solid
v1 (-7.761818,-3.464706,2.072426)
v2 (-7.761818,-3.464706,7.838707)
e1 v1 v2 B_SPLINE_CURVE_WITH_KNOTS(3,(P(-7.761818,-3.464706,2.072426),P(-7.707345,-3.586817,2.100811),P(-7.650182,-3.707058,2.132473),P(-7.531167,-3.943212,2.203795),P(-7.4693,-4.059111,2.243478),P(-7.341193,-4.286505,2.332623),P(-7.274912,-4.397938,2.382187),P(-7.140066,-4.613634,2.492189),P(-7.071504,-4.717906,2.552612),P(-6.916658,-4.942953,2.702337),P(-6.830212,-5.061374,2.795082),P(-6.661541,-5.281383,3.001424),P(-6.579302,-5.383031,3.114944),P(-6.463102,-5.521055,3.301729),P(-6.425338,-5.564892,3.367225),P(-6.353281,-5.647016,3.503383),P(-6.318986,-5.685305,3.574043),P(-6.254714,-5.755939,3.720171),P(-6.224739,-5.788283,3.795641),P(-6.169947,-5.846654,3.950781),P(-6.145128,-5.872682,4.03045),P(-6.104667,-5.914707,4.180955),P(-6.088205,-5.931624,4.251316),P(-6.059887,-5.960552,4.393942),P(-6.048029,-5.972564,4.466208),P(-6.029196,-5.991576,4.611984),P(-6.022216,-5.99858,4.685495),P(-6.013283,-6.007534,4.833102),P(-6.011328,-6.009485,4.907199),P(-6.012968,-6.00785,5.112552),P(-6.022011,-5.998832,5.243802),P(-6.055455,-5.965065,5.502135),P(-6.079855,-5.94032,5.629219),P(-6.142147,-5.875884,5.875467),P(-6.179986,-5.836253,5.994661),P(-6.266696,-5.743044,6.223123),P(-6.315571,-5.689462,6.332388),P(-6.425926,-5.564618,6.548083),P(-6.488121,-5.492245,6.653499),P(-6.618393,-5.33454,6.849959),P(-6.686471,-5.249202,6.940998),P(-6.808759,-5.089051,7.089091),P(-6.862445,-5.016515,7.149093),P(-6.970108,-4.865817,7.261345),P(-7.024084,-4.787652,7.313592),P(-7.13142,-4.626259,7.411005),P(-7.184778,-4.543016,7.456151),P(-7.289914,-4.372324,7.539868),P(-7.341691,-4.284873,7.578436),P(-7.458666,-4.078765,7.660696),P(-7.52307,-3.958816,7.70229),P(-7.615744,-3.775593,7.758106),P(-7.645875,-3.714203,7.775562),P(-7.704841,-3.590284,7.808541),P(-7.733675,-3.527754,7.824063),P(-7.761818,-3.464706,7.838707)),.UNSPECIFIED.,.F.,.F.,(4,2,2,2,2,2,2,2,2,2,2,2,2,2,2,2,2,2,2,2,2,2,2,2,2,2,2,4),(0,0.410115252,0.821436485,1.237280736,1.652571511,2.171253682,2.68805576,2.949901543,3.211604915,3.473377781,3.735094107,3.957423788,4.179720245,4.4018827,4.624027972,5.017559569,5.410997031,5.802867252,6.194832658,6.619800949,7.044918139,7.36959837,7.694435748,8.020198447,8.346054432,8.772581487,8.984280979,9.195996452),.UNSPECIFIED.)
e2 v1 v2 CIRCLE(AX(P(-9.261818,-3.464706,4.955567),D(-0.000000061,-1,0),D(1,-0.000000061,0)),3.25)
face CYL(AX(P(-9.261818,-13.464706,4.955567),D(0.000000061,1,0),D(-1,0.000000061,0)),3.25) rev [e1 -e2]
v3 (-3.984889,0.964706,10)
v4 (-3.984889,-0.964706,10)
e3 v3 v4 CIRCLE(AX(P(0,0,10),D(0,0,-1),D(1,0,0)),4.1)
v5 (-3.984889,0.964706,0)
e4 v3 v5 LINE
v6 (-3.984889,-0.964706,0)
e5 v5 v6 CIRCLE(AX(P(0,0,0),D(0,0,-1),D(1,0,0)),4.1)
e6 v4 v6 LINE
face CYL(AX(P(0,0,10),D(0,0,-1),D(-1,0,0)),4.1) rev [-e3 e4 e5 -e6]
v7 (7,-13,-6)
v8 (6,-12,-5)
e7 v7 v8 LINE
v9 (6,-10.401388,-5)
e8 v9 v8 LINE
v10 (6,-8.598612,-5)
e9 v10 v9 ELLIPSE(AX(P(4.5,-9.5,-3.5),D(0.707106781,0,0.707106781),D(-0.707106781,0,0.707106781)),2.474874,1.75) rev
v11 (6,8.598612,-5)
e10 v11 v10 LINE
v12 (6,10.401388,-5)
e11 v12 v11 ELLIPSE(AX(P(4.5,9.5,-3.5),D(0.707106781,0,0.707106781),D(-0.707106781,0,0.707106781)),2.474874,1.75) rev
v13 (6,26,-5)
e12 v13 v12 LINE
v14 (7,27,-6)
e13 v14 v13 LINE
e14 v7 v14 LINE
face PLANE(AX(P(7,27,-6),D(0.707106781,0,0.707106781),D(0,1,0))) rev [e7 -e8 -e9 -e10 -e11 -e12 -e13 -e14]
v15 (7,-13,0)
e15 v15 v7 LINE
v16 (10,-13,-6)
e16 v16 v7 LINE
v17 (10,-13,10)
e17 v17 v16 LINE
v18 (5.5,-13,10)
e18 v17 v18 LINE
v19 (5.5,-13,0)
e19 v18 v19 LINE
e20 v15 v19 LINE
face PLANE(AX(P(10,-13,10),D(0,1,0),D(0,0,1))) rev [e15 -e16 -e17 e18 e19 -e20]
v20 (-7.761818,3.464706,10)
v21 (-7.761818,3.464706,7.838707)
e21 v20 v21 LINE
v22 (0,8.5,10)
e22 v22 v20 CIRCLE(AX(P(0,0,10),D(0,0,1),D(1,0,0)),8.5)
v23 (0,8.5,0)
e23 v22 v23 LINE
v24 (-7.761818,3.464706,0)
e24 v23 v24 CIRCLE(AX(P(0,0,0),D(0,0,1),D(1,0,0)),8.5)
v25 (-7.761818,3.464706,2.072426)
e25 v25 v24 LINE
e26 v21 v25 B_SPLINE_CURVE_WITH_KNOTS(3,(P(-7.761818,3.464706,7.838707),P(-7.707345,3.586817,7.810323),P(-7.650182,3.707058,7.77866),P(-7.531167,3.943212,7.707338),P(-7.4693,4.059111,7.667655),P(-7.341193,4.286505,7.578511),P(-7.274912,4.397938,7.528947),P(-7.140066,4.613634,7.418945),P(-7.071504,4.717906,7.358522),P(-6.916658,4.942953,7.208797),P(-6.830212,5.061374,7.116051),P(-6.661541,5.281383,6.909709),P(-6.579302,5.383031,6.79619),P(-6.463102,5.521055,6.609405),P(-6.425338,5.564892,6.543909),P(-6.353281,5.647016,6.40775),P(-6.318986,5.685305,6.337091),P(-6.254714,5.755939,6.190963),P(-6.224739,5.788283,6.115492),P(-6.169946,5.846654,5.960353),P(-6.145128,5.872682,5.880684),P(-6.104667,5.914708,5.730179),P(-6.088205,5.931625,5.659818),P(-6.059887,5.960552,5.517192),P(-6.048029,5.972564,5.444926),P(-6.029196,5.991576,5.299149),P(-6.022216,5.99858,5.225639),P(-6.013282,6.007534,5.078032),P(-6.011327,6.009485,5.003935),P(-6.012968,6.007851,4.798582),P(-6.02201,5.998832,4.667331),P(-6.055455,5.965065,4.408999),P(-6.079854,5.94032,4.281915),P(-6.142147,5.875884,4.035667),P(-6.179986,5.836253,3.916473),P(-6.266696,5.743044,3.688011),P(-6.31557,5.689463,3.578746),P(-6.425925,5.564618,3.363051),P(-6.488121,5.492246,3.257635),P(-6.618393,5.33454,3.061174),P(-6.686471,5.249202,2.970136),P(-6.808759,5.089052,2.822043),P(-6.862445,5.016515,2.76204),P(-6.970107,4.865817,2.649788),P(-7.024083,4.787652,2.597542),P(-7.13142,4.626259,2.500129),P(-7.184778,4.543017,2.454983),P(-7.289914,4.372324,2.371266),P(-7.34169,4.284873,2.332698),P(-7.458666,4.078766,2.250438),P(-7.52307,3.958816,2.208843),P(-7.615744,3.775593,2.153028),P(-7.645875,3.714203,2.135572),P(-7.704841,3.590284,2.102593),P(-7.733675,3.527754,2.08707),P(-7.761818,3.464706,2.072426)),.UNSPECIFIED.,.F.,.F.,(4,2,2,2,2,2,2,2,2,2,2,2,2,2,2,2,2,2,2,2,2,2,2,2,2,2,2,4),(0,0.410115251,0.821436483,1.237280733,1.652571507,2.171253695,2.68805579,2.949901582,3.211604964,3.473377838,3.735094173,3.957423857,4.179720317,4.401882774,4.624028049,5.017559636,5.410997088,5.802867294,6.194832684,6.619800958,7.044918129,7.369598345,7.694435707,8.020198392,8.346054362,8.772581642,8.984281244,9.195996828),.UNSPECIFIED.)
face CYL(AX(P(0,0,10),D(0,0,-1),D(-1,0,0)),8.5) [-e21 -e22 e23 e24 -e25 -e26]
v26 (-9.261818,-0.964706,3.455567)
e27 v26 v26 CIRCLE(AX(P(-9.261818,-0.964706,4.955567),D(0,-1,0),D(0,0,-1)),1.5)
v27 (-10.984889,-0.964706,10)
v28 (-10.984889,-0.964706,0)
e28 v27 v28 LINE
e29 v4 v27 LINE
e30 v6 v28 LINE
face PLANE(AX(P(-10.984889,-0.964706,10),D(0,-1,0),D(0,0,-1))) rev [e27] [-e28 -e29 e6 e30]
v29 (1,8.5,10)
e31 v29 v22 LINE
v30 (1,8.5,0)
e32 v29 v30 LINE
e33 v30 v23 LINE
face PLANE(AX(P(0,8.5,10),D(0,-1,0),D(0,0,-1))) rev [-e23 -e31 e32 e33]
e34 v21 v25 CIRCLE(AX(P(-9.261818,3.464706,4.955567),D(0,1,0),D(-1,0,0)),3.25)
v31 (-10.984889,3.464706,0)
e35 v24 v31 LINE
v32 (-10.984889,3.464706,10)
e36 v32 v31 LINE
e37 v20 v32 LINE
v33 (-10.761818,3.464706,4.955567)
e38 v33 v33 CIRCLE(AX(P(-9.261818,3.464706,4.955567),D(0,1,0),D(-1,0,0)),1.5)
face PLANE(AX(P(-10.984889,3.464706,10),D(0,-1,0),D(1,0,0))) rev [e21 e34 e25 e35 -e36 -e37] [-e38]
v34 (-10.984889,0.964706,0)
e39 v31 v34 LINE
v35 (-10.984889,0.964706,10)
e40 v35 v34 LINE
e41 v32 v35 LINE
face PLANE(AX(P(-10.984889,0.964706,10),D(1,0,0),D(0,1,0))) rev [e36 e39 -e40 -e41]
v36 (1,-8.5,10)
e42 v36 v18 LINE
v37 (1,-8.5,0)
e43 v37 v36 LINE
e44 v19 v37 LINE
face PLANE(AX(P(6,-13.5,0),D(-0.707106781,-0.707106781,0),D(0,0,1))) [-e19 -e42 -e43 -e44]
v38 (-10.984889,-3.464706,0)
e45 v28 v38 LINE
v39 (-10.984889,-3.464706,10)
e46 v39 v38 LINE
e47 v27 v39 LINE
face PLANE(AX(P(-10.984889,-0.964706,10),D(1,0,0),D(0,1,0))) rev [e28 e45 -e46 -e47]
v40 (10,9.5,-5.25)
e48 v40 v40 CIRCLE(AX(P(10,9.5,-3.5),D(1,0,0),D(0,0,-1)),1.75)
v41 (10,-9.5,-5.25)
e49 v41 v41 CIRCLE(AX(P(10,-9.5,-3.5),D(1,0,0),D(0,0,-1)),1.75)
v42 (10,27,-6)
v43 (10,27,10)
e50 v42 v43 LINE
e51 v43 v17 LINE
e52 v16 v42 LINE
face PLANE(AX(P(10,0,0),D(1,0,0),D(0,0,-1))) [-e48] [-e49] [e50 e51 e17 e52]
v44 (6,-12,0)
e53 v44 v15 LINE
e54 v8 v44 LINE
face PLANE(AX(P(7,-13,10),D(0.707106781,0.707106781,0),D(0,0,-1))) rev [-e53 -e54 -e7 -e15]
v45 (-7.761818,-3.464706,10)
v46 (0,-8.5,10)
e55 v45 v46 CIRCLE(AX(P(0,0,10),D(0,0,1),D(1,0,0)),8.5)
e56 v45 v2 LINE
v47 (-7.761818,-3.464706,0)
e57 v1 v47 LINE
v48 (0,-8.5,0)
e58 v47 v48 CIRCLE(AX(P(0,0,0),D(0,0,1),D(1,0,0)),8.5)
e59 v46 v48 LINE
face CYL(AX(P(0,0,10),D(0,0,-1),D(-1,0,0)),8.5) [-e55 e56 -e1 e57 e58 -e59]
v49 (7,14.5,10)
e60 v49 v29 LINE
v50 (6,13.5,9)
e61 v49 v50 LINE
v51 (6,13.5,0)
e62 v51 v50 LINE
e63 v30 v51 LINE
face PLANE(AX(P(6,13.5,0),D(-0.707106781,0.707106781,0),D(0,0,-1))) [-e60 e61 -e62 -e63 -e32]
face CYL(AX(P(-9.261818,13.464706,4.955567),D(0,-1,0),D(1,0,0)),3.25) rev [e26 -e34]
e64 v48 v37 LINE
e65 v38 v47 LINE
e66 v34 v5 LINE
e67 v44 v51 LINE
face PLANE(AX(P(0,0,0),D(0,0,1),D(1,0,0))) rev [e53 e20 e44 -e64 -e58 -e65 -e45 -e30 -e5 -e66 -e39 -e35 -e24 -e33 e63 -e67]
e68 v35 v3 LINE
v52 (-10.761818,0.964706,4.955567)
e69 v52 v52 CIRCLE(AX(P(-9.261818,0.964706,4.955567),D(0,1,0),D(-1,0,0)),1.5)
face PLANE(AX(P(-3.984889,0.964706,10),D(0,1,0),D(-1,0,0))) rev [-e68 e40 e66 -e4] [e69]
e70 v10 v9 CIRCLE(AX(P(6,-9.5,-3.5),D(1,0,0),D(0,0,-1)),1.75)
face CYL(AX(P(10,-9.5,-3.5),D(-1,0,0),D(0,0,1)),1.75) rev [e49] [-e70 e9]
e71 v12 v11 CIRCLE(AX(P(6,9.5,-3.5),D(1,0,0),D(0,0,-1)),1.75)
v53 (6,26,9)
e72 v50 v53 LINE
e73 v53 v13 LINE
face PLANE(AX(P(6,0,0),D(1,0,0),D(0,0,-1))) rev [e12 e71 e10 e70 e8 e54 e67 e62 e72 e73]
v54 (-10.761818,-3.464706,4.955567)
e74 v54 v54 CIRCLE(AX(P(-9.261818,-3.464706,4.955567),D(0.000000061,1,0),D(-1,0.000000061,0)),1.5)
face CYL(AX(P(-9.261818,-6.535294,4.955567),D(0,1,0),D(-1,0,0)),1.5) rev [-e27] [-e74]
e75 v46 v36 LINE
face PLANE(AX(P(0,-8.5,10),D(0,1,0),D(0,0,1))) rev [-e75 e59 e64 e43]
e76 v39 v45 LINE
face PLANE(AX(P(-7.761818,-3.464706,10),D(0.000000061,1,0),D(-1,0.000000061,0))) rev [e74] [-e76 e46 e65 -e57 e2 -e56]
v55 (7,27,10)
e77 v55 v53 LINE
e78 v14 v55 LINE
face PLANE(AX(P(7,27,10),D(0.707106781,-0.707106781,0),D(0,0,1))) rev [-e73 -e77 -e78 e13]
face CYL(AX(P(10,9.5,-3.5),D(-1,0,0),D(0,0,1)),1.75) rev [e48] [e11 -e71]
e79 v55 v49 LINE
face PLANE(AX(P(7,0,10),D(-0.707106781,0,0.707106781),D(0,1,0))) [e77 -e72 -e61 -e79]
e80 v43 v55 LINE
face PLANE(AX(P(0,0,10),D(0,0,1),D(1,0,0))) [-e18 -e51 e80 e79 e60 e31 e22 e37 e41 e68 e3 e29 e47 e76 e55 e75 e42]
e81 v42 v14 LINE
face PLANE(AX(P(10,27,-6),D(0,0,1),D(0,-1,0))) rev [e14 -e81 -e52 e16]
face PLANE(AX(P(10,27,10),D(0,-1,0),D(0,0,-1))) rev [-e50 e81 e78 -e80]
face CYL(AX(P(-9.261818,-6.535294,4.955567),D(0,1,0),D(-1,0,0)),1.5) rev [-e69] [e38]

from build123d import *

# Parameters (mm, degrees)
RESSALTO_EXTRUS_O1_DEPTH = 10
ESBO_O2_R                = 3.25
CORTE_EXTRUS_O1_DEPTH    = 10
ESBO_O3_R                = 1.5
CORTE_EXTRUS_O2_DEPTH    = 10
CORTE_EXTRUS_O3_START    = 10
ESBO_O4_R                = 3.25
CORTE_EXTRUS_O3_DEPTH    = 10
ESBO_O5_W                = 16
ESBO_O5_H                = 40
ESBO_O5_R                = 1.75
RESSALTO_EXTRUS_O2_DEPTH = 4
CHANFRO1_SIZE            = 5
CHANFRO2_SIZE            = 5
CHANFRO3_SIZE            = 1


with BuildPart() as part:
    # Esboço1 → Ressalto-extrusão1 (new body)
    with BuildSketch(Plane.XY):
        with BuildLine():
            Line((0, 8.5), (8.5, 8.5))
            Line((8.5, 8.5), (8.5, 0))
            Line((8.5, 0), (8.5, -8.5))
            Line((8.5, -8.5), (0, -8.5))
            ThreePointArc((0, -8.5), (-4.626013402, -7.130918594), (-7.761817645, -3.464705882))
            Line((-7.761817645, -3.464705882), (-10.984889326, -3.464705686))
            Line((-10.984889326, -3.464705686), (-10.984889326, -0.964705686))
            Line((-10.984889326, -0.964705686), (-3.984889326, -0.964705686))
            ThreePointArc((-3.984889326, -0.964705686), (4.1, -1.01e-07), (-3.984889278, 0.964705882))
            Line((-3.984889278, 0.964705882), (-10.984889278, 0.964705882))
            Line((-10.984889278, 0.964705882), (-10.984889278, 3.464705882))
            Line((-10.984889278, 3.464705882), (-7.761817645, 3.464705882))
            ThreePointArc((-7.761817645, 3.464705882), (-4.626013402, 7.130918594), (0, 8.5))
        make_face()
    extrude(amount=RESSALTO_EXTRUS_O1_DEPTH)

    # Esboço2 → Corte-extrusão1 (cut)
    with BuildSketch(Plane(origin=(0, 3.464705882, 0), x_dir=(1, 0, 0), z_dir=(0, 1, 0))):
        with Locations((-9.261817645, -4.955566824)):
            Circle(ESBO_O2_R)
    extrude(amount=CORTE_EXTRUS_O1_DEPTH, mode=Mode.SUBTRACT)

    # Esboço3 → Corte-extrusão2 (cut)
    with BuildSketch(Plane(origin=(0, 3.464705882, 0), x_dir=(1, 0, 0), z_dir=(0, 1, 0))):
        with Locations(Location((-9.261817645, -4.955566824, 0), (0, 0, 180))):
            Circle(ESBO_O3_R)
    extrude(amount=-CORTE_EXTRUS_O2_DEPTH, mode=Mode.SUBTRACT)

    # Esboço4 → Corte-extrusão3 (cut)
    with BuildSketch(Plane(origin=(-2.11e-07, -3.464706354, 0), x_dir=(-0.9999999999999982, 6.08161782252128e-08, 0), z_dir=(-6.081617822521279e-08, -0.9999999999999981, 0)).offset(CORTE_EXTRUS_O3_START)):
        with Locations((9.261817434, -4.955566824)):
            Circle(ESBO_O4_R)
    extrude(amount=-CORTE_EXTRUS_O3_DEPTH, mode=Mode.SUBTRACT)

    # Esboço5 → Ressalto-extrusão2 (add)
    with BuildSketch(Plane(origin=(6, 0, 0), x_dir=(0, 0, -1), z_dir=(1, 0, 0))):
        with Locations((-2, 7)):
            Rectangle(ESBO_O5_W, ESBO_O5_H)
        with Locations((3.5, 9.5)):
            Circle(ESBO_O5_R, mode=Mode.SUBTRACT)
        with Locations((3.5, -9.5)):
            Circle(ESBO_O5_R, mode=Mode.SUBTRACT)
    extrude(amount=RESSALTO_EXTRUS_O2_DEPTH)

    # Chanfro1
    chanfro1_edges = [part.edges().sort_by_distance(p)[0] for p in [
        (6, 8.5, 5),
    ]]
    chamfer(chanfro1_edges, length=CHANFRO1_SIZE)

    # Chanfro2
    # the kernel refuses this chamfer: 5 mm, written as the material it adds along each edge
    with BuildSketch(Plane(origin=(6, -8.5, 10), x_dir=(-0.9996219169112968, 0.027495876610586317, 0), z_dir=(0, 0, -1))) as chanfro2_piece_1_section:
        Polygon((CHANFRO2_SIZE * 0.999621916911, -CHANFRO2_SIZE * 0.0274958766106), (-CHANFRO2_SIZE * 0.0274958766106, -CHANFRO2_SIZE * 0.999621916911), (0, 0), align=None)
    chanfro2_piece_1 = extrude(amount=10, mode=Mode.PRIVATE)
    chanfro2_piece_1 = split(chanfro2_piece_1, bisect_by=Plane(origin=(4.320496265, -13, 5), z_dir=(0, 1, 0)), keep=Keep.TOP, mode=Mode.PRIVATE)
    add(chanfro2_piece_1)

    # Chanfro3
    # the kernel refuses this chamfer: 1 mm, written as the material it takes off along each edge
    with BuildSketch(Plane(origin=(6, -13, -8.571682988), x_dir=(-0.02749587661058651, 0.9996219169112968, 0), z_dir=(0, 0, 1))) as chanfro3_piece_1:
        Polygon((CHANFRO3_SIZE * 0.999621916911, -CHANFRO3_SIZE * 0.0274958766106), (-CHANFRO3_SIZE * 0.0274958766106, -CHANFRO3_SIZE * 0.999621916911), (0, 0), align=None)
    extrude(amount=8.571682988, mode=Mode.SUBTRACT)
    with BuildSketch(Plane(origin=(6, 10.928317012, 10), x_dir=(-0.02749587661058651, 0, -0.9996219169112968), z_dir=(0, 1, 0))) as chanfro3_piece_2_section:
        Polygon((CHANFRO3_SIZE * 0.999621916911, -CHANFRO3_SIZE * 0.0274958766106), (-CHANFRO3_SIZE * 0.0274958766106, -CHANFRO3_SIZE * 0.999621916911), (0, 0), align=None)
    chanfro3_piece_2 = extrude(amount=18.643365976, mode=Mode.PRIVATE)
    chanfro3_piece_2 = split(chanfro3_piece_2, bisect_by=Plane(origin=(10.262240478, 17.762240478, 9.668049788), z_dir=(-0.7071067811865476, 0.7071067811865476, 0)), keep=Keep.TOP, mode=Mode.PRIVATE)
    add(chanfro3_piece_2, mode=Mode.SUBTRACT)
    with BuildSketch(Plane(origin=(6, 29.571682988, -6), x_dir=(-0.027495876610586487, 0, 0.9996219169112968), z_dir=(0, -1, 0))) as chanfro3_piece_3:
        Polygon((CHANFRO3_SIZE * 0.999621916911, -CHANFRO3_SIZE * 0.0274958766106), (-CHANFRO3_SIZE * 0.0274958766106, -CHANFRO3_SIZE * 0.999621916911), (0, 0), align=None)
    extrude(amount=45.143365976, mode=Mode.SUBTRACT)
    with BuildSketch(Plane(origin=(6, 27, 12.571682988), x_dir=(-0.02749587661058651, -0.9996219169112968, 0), z_dir=(0, 0, -1))) as chanfro3_piece_4:
        Polygon((CHANFRO3_SIZE * 0.999621916911, -CHANFRO3_SIZE * 0.0274958766106), (-CHANFRO3_SIZE * 0.0274958766106, -CHANFRO3_SIZE * 0.999621916911), (0, 0), align=None)
    extrude(amount=21.143365976, mode=Mode.SUBTRACT)


solid = part.part
